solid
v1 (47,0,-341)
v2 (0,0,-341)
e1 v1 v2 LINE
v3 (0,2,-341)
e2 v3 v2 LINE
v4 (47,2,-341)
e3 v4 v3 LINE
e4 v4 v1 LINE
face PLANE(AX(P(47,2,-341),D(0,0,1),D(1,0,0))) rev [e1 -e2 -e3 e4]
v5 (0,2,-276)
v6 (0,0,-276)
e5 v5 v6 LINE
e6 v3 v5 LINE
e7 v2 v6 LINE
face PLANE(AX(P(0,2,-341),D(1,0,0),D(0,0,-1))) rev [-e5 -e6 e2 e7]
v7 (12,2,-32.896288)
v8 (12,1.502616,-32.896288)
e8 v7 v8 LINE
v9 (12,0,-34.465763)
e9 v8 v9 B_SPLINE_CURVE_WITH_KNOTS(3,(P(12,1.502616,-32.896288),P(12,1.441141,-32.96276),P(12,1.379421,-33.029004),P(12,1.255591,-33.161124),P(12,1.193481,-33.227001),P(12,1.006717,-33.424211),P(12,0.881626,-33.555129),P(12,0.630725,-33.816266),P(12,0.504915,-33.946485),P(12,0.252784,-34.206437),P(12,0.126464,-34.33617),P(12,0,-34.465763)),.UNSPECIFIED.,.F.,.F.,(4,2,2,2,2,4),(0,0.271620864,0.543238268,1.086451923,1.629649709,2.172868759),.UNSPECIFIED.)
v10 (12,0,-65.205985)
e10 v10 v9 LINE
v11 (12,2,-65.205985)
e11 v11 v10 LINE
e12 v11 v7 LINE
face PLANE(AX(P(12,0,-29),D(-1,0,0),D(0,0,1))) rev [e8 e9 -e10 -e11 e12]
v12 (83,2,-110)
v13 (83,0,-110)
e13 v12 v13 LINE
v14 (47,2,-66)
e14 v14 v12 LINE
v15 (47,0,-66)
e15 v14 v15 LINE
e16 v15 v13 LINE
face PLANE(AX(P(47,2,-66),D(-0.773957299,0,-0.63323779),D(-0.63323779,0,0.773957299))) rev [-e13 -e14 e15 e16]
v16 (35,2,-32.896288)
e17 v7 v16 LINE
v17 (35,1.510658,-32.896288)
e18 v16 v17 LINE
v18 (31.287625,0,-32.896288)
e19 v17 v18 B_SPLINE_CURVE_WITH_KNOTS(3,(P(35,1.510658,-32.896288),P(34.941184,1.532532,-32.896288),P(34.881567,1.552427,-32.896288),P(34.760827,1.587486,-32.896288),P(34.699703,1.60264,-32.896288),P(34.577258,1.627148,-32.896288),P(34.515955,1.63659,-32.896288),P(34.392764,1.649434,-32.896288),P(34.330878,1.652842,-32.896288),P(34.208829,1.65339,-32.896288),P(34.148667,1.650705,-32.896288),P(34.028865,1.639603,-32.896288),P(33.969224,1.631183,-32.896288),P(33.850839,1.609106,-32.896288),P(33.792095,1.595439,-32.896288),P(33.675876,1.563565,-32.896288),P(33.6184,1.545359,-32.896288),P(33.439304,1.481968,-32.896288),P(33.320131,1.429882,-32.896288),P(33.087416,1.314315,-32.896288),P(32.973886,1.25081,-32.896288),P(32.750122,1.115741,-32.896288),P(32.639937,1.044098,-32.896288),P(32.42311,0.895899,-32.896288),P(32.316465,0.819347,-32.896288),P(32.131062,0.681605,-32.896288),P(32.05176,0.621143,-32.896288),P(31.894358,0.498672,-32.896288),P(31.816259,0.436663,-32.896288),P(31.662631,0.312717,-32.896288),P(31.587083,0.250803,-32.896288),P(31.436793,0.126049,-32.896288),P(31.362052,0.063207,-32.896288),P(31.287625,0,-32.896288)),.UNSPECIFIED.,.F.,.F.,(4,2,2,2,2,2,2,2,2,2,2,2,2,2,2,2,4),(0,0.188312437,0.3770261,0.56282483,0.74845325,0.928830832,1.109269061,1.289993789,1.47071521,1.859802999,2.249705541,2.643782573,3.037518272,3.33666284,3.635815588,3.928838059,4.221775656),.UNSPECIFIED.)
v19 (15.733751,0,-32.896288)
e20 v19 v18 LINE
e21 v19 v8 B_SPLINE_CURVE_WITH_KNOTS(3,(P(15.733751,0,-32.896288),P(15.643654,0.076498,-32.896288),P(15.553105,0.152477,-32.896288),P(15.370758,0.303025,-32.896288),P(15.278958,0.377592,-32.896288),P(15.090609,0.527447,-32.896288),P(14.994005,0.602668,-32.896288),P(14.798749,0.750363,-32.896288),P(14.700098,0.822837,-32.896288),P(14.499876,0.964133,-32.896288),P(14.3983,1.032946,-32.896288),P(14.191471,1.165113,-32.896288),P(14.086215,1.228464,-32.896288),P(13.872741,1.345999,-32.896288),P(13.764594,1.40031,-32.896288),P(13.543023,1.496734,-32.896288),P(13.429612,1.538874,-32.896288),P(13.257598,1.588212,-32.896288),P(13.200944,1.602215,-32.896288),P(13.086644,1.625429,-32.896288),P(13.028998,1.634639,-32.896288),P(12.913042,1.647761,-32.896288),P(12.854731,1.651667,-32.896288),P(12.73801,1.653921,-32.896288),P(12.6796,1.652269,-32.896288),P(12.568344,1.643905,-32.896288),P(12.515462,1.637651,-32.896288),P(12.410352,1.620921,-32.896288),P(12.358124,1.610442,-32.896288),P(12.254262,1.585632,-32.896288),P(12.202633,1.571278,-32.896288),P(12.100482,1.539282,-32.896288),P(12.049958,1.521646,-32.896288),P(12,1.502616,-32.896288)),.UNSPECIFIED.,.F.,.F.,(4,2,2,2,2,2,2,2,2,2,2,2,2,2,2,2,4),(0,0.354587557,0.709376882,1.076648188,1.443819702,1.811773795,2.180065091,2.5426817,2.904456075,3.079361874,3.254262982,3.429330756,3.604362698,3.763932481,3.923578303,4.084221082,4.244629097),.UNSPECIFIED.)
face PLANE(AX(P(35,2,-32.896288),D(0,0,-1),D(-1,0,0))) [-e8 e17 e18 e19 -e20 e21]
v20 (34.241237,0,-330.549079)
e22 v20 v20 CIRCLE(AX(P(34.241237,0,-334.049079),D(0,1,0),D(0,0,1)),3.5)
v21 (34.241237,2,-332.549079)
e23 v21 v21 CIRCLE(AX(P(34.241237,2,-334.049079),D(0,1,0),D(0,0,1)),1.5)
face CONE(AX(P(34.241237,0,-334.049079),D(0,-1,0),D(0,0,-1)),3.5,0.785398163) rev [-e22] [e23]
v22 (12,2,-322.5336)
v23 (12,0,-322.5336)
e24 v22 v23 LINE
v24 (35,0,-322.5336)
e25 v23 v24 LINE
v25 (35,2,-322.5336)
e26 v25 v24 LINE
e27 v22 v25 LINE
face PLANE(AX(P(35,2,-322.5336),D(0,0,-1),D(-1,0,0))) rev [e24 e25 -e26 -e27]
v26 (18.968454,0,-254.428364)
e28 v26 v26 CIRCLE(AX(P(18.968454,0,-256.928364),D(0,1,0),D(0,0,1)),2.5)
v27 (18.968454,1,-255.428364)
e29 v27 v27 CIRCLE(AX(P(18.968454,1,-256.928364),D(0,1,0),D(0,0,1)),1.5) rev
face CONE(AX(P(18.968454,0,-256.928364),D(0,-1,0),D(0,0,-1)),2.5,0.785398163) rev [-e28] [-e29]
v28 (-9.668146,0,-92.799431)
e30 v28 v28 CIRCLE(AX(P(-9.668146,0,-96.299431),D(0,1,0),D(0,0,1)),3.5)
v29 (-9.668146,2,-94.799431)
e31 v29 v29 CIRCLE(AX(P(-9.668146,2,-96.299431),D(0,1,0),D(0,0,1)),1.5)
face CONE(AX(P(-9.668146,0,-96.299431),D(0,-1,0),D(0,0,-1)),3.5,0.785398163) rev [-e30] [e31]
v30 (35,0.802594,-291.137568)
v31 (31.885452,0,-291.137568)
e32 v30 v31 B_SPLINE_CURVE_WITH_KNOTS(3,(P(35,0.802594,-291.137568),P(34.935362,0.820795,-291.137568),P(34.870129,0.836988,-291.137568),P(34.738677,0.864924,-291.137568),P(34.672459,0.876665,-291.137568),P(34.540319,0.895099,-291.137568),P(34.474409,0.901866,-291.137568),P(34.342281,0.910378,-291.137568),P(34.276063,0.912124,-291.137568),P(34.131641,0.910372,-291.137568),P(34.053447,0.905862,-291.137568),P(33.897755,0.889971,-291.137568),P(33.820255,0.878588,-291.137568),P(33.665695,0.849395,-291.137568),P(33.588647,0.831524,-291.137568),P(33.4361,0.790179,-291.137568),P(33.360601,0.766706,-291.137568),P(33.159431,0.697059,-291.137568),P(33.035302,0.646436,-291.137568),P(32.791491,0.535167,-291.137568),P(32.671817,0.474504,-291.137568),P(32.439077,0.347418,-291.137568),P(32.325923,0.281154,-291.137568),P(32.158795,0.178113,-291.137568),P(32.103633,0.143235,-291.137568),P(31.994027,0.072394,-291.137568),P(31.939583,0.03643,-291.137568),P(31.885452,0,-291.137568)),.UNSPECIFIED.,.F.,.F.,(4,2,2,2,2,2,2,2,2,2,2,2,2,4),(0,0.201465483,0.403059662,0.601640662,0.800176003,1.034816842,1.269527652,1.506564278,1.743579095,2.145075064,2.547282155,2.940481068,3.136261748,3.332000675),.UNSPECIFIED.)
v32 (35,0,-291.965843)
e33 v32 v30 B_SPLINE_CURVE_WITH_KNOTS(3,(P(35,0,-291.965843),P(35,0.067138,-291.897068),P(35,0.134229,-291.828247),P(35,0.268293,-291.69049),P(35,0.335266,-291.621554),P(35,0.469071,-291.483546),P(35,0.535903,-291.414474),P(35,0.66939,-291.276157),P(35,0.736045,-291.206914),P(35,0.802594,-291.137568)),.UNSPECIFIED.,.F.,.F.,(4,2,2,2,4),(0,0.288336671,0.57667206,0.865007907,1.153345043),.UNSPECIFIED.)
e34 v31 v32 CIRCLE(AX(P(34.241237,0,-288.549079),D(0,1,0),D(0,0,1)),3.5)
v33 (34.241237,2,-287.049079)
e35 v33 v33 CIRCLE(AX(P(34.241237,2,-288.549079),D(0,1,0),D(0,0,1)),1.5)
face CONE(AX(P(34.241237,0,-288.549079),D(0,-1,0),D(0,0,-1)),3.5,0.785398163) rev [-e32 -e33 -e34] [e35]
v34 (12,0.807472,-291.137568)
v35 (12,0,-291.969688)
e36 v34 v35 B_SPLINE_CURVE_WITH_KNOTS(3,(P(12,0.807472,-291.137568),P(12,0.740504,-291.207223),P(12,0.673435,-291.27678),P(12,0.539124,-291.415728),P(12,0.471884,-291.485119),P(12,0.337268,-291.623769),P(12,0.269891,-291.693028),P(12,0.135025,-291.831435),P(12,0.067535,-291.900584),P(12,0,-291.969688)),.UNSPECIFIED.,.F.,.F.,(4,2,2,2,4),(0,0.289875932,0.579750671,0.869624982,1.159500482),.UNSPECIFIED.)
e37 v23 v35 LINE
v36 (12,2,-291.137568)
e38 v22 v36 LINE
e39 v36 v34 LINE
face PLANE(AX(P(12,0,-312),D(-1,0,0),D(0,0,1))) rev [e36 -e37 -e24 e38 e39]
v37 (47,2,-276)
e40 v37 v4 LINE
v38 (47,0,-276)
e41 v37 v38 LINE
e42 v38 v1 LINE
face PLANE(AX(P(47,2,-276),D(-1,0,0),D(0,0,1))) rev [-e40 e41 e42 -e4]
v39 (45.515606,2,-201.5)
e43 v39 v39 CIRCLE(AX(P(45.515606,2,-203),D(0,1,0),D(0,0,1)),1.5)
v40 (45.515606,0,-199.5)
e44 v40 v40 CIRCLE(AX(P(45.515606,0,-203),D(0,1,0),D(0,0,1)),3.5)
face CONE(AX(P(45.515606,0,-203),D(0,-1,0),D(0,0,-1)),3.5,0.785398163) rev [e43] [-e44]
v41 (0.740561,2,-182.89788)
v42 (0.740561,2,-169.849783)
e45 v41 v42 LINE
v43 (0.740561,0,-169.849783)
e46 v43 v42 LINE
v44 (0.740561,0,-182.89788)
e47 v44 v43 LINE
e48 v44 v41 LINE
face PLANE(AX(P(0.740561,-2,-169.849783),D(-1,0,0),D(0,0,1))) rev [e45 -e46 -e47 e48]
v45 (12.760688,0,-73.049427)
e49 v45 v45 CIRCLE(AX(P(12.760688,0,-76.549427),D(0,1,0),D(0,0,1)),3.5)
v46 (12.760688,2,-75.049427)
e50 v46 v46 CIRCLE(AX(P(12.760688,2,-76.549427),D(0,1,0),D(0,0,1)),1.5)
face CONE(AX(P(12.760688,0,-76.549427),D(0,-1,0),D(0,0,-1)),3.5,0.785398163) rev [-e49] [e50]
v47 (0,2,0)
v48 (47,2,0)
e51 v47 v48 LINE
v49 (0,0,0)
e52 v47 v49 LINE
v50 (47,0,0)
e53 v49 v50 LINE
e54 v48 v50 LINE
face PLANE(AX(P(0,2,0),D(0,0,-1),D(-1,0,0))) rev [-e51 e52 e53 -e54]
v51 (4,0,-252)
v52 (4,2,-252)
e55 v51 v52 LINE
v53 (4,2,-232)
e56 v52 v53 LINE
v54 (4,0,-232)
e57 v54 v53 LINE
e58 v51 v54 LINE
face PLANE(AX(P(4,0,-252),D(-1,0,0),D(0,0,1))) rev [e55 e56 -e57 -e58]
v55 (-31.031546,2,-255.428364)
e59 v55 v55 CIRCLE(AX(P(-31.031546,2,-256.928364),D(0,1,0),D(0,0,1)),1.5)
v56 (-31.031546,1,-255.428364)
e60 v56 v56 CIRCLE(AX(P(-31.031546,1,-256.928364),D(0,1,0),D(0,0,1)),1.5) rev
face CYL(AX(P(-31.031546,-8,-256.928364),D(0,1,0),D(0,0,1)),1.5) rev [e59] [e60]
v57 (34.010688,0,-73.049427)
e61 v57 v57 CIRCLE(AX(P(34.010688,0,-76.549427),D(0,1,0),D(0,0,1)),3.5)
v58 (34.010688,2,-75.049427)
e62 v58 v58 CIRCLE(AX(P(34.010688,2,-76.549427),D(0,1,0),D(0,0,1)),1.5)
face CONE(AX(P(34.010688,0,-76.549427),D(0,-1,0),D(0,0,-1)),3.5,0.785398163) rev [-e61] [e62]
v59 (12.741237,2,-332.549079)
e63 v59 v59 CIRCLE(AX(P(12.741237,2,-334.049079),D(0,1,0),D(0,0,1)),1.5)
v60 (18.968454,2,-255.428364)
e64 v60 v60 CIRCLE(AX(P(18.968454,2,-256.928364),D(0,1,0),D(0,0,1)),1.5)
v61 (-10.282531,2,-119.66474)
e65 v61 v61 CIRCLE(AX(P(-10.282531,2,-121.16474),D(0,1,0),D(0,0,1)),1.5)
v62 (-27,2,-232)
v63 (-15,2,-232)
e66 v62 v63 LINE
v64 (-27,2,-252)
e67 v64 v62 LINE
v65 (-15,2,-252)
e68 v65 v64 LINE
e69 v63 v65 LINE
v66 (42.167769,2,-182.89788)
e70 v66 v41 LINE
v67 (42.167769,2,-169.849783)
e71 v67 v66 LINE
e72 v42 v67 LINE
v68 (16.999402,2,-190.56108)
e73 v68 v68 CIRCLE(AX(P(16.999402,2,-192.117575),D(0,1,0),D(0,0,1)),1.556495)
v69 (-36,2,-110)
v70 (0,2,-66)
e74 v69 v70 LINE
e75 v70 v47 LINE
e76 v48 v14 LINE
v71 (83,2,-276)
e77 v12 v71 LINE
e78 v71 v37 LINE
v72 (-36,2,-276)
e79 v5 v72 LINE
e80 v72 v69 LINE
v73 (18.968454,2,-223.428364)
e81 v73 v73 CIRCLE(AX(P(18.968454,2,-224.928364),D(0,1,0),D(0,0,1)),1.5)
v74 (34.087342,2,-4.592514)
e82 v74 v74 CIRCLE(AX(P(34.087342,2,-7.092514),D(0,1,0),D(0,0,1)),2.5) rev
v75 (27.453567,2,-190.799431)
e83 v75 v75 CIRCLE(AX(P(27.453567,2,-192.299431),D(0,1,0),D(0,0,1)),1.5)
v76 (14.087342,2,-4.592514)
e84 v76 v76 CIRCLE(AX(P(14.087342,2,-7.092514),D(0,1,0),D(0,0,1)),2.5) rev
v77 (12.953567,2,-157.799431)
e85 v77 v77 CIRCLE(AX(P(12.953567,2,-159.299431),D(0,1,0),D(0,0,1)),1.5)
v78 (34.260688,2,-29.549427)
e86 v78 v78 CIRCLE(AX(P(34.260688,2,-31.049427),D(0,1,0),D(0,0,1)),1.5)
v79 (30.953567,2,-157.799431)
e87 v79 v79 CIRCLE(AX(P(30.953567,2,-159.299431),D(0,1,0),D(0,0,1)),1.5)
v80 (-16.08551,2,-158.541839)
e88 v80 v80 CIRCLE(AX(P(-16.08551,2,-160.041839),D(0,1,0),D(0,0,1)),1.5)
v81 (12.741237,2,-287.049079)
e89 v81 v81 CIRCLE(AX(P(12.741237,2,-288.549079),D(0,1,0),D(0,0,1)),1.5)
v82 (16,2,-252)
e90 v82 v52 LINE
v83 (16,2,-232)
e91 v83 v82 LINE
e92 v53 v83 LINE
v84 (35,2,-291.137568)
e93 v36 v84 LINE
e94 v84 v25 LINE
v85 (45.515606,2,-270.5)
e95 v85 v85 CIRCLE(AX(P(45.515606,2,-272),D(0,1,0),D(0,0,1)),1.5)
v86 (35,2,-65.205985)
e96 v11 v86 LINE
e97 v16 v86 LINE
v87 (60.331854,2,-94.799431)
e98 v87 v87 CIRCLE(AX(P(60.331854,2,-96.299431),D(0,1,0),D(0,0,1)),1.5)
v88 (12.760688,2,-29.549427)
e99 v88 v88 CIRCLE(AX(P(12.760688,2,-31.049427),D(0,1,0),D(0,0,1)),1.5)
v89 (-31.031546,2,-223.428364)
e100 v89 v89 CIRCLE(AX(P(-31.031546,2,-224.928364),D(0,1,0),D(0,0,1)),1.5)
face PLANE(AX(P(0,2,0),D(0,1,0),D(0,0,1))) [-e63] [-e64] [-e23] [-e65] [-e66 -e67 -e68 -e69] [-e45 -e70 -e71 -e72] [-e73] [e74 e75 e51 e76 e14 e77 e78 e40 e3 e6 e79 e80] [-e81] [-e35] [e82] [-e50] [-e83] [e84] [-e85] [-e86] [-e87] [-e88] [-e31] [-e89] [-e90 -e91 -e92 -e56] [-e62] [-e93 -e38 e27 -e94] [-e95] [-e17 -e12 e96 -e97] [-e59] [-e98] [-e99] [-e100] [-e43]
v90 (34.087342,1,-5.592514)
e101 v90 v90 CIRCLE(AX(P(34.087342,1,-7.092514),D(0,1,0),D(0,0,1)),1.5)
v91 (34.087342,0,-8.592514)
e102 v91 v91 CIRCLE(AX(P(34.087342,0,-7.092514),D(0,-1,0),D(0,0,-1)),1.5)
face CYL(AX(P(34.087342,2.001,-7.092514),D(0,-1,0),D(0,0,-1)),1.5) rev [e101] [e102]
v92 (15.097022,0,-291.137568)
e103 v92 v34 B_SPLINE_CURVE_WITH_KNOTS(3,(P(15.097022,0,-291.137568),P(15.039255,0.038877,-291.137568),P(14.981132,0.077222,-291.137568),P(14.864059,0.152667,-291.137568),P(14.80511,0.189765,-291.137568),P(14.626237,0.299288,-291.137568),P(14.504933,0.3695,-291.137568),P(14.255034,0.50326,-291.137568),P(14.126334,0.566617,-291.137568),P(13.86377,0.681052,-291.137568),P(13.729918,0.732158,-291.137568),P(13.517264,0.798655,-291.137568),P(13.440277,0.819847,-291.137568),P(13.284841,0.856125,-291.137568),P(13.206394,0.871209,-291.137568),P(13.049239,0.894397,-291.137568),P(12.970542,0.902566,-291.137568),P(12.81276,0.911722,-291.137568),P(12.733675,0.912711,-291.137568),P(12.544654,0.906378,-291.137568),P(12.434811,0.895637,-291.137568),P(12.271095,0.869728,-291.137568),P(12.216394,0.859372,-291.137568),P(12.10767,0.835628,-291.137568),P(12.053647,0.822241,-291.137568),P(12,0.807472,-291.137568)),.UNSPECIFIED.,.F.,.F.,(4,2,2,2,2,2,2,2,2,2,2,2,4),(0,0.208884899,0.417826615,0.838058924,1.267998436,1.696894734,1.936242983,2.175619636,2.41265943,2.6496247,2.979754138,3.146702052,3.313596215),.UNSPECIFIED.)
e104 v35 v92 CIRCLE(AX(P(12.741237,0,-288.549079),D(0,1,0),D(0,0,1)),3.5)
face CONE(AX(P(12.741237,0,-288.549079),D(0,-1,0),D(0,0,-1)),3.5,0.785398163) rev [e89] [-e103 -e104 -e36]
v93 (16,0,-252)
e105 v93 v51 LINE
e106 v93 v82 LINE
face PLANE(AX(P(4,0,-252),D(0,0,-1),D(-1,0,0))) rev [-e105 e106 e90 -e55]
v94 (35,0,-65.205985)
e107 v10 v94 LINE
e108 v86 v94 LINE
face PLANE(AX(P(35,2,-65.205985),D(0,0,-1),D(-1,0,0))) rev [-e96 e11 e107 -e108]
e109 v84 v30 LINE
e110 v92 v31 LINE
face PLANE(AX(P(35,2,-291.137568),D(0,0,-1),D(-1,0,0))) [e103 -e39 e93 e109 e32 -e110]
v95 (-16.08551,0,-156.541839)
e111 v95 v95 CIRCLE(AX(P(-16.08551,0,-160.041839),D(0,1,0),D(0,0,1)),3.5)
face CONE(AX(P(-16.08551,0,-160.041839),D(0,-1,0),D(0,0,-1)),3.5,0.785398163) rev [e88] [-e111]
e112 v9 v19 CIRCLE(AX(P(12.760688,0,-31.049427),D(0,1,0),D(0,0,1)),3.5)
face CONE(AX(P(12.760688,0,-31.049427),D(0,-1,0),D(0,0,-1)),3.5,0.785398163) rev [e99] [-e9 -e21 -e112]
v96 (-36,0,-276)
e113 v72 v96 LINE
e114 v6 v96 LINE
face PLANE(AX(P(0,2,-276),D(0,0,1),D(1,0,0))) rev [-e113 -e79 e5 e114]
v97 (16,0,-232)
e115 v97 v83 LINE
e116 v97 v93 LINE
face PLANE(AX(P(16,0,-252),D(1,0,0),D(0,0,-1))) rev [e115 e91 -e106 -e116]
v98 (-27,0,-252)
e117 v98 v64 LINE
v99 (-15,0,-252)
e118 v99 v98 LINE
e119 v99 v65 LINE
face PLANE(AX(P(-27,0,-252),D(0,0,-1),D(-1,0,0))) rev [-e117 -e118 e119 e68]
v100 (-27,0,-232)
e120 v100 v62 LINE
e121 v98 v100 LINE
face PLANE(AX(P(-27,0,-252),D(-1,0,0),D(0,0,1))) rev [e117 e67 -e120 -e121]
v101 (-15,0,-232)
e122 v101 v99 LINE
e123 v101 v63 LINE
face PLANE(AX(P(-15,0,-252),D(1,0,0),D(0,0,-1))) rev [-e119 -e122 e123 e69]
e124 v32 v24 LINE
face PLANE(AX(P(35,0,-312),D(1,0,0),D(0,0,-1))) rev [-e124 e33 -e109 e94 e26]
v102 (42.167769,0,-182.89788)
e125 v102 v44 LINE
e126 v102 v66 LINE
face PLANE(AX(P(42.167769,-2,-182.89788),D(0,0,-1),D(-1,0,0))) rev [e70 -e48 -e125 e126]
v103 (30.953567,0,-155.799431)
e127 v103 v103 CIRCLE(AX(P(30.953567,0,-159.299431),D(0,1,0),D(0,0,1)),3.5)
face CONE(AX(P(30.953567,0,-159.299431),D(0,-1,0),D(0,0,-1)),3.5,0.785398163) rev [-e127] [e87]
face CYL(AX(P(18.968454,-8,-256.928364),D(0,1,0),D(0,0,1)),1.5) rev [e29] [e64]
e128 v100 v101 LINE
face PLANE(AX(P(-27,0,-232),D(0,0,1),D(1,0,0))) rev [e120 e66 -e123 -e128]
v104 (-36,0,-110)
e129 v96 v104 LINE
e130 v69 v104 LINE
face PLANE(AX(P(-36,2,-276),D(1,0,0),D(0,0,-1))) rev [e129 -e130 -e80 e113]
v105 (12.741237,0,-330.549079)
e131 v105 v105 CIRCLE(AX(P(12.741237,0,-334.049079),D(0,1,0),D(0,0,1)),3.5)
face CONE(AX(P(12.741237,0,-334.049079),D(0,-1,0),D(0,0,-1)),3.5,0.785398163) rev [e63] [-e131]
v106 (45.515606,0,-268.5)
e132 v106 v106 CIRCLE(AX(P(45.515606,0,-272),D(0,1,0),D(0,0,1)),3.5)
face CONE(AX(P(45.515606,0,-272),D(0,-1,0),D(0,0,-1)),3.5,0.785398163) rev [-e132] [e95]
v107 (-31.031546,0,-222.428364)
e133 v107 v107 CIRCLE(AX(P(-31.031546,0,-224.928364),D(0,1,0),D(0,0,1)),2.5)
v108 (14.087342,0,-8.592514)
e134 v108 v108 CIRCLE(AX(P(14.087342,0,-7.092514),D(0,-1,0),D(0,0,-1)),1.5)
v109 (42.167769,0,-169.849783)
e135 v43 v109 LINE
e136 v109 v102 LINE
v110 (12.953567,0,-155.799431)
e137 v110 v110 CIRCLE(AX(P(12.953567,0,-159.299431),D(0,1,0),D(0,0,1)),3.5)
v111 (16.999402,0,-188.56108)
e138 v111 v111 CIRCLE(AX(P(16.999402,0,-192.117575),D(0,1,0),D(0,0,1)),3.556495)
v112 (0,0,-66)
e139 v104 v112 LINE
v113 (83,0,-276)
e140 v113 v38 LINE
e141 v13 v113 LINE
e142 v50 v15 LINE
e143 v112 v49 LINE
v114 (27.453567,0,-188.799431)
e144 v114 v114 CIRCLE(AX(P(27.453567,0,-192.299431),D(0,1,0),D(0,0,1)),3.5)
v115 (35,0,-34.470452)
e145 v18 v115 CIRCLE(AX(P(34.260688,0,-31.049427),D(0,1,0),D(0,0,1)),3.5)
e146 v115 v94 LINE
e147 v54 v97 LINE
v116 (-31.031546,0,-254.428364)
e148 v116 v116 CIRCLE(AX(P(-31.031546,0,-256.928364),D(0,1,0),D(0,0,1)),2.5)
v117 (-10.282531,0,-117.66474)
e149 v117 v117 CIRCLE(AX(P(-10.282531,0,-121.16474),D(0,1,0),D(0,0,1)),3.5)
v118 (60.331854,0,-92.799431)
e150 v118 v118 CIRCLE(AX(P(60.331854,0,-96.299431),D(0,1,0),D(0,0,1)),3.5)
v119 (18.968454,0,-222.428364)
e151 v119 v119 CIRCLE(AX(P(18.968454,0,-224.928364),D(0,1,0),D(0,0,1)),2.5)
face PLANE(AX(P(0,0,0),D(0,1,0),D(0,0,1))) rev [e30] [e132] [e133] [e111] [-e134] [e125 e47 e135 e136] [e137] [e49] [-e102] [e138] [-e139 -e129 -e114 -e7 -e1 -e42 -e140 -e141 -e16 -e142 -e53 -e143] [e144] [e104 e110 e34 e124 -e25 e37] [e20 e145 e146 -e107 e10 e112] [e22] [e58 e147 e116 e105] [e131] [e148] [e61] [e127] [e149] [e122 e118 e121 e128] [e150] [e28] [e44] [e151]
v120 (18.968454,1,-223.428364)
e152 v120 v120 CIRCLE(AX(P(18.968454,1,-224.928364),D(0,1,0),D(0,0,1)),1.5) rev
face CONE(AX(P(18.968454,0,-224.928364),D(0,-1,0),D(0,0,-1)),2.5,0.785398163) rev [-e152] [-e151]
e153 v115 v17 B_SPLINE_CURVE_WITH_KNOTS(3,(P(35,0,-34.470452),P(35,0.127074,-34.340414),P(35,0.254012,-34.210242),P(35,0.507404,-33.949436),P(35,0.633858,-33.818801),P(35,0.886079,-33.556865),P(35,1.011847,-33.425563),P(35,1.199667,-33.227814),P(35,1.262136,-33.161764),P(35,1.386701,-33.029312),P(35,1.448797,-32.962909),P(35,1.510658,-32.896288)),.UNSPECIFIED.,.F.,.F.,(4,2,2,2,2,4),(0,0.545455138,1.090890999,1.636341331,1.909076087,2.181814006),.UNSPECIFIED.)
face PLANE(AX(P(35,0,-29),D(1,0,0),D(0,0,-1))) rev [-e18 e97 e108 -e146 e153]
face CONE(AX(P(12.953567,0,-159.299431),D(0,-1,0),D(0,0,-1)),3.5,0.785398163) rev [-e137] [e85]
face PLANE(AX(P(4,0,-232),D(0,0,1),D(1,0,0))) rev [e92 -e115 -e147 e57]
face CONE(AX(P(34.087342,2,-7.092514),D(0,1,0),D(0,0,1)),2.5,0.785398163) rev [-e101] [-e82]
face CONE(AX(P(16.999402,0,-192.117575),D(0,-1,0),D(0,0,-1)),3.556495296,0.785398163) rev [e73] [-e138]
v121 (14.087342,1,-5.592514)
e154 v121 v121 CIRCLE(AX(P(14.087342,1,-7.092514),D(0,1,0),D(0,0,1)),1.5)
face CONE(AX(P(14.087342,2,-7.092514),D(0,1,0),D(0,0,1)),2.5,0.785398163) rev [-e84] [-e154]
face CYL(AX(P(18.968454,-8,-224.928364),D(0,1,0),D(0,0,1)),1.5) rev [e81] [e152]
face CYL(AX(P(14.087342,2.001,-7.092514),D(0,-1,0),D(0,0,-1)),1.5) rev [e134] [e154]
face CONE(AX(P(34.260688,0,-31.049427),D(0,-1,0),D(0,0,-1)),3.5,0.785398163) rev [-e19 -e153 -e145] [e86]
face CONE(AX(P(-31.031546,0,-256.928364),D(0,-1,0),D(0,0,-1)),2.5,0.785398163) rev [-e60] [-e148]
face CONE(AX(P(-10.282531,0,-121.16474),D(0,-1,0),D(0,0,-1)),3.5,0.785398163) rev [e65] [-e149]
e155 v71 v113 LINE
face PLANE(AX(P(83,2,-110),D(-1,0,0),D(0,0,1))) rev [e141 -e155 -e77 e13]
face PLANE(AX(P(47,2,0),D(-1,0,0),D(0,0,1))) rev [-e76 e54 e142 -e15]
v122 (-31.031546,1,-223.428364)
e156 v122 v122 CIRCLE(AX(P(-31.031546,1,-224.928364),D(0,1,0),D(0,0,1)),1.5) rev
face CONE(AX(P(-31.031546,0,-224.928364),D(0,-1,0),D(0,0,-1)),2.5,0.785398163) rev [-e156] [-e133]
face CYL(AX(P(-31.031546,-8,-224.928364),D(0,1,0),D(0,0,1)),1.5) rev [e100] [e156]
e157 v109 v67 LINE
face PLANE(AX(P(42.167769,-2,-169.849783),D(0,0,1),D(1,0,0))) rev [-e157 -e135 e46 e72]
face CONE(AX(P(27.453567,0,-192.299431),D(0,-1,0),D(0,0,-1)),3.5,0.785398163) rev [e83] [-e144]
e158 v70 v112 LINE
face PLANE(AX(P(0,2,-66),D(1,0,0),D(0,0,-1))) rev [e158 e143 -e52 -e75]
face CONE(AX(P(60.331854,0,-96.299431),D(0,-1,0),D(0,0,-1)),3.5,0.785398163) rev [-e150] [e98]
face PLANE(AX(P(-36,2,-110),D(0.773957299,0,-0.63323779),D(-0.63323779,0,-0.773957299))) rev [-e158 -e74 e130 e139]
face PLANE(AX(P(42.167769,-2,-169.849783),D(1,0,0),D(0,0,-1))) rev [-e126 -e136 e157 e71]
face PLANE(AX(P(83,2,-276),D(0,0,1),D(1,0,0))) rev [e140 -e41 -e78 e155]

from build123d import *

# Parameters (mm, degrees)
BOSS_EXTRUDE2_DEPTH = 2
SKETCH5_W           = 23
SKETCH5_H           = 26
CUT_EXTRUDE1_DEPTH  = 2
SKETCH6_W           = 23
SKETCH6_H           = 26
CUT_EXTRUDE2_DEPTH  = 2
SKETCH7_W           = 12
SKETCH7_H           = 20
CUT_EXTRUDE3_DEPTH  = 2
SKETCH8_W           = 12
SKETCH8_H           = 20
CUT_EXTRUDE4_DEPTH  = 2
SKETCH9_R           = 1.5
CUT_EXTRUDE5_DEPTH  = 4
SKETCH10_R          = 1.5
CUT_EXTRUDE6_DEPTH  = 4
SKETCH11_R          = 1.5
SKETCH11_R_2        = 1.556495296
CUT_EXTRUDE7_DEPTH  = 4
CHAMFER1_SIZE       = 2
SKETCH12_W          = 41.427208619
SKETCH12_H          = 13.04809718
CUT_EXTRUDE8_DEPTH  = 4
SKETCH13_R          = 1.5
CUT_EXTRUDE9_DEPTH  = 10
CHAMFER2_SIZE       = 2
SKETCH14_W          = 23
SKETCH14_H          = 3.896287967
BOSS_EXTRUDE3_DEPTH = 2
SKETCH15_W          = 23
SKETCH15_H          = 6.016100964
CUT_EXTRUDE10_DEPTH = 2
SKETCH16_W          = 23
SKETCH16_H          = 4.189884345
CUT_EXTRUDE11_DEPTH = 2
SKETCH17_R          = 1.5
CUT_EXTRUDE12_DEPTH = 2
CHAMFER4_SIZE       = 2
SKETCH19_W          = 23
SKETCH19_H          = 7.922215634
CUT_EXTRUDE13_DEPTH = 2
SKETCH20_W          = 23
SKETCH20_H          = 2.611384529
CUT_EXTRUDE14_DEPTH = 2
SKETCH22_W          = 23
SKETCH22_H          = 5.13756828
BOSS_EXTRUDE5_DEPTH = 2
SKETCH23_R          = 1.5
CUT_EXTRUDE16_DEPTH = 2
CHAMFER6_SIZE       = 2
SKETCH24_R          = 1.5
CUT_EXTRUDE17_DEPTH = 10
CHAMFER7_SIZE       = 1
CUT_EXTRUDE18_REACH = 352.962
SKETCH25_R          = 1.5
CHAMFER8_SIZE       = 1


# Some blends are built 0.0001 mm under size
with BuildPart() as part:
    # Sketch4 → Boss-Extrude2 (new body)
    with BuildSketch(Plane(origin=(0, 0, 0), x_dir=(1, 0, 0), z_dir=(0, 1, 0))):
        Polygon((0, 341), (0, 276), (-36, 276), (-36, 110), (0, 66), (0, 0), (47, 0), (47, 66), (83, 110), (83, 276), (47, 276), (47, 341), align=None)
    extrude(amount=BOSS_EXTRUDE2_DEPTH)

    # Sketch5 → Cut-Extrude1 (cut)
    with BuildSketch(Plane(origin=(0, 2, 0), x_dir=(1, 0, 0), z_dir=(0, 1, 0))):
        with Locations((23.5, 42)):
            Rectangle(SKETCH5_W, SKETCH5_H)
    extrude(amount=-CUT_EXTRUDE1_DEPTH, mode=Mode.SUBTRACT)

    # Sketch6 → Cut-Extrude2 (cut)
    with BuildSketch(Plane(origin=(0, 2, 0), x_dir=(1, 0, 0), z_dir=(0, 1, 0))):
        with Locations((23.5, 299)):
            Rectangle(SKETCH6_W, SKETCH6_H)
    extrude(amount=-CUT_EXTRUDE2_DEPTH, mode=Mode.SUBTRACT)

    # Sketch7 → Cut-Extrude3 (cut)
    with BuildSketch(Plane(origin=(0, 2, 0), x_dir=(1, 0, 0), z_dir=(0, 1, 0))):
        with Locations((-21, 242)):
            Rectangle(SKETCH7_W, SKETCH7_H)
    extrude(amount=-CUT_EXTRUDE3_DEPTH, mode=Mode.SUBTRACT)

    # Sketch8 → Cut-Extrude4 (cut)
    with BuildSketch(Plane(origin=(0, 2, 0), x_dir=(1, 0, 0), z_dir=(0, 1, 0))):
        with Locations((10, 242)):
            Rectangle(SKETCH8_W, SKETCH8_H)
    extrude(amount=-CUT_EXTRUDE4_DEPTH, mode=Mode.SUBTRACT)

    # Sketch9 → Cut-Extrude5 (cut)
    with BuildSketch(Plane(origin=(0, 2, 0), x_dir=(1, 0, 0), z_dir=(0, 1, 0))):
        with Locations(Location((-9.668146344, 96.299430829, 0), (0, 0, 270))):
            Circle(SKETCH9_R)
        with Locations(Location((60.331853656, 96.299430845, 0), (0, 0, 270))):
            Circle(SKETCH9_R)
    extrude(amount=-CUT_EXTRUDE5_DEPTH, mode=Mode.SUBTRACT)

    # Sketch10 → Cut-Extrude6 (cut)
    with BuildSketch(Plane(origin=(0, 2, 0), x_dir=(1, 0, 0), z_dir=(0, 1, 0))):
        with Locations(Location((45.515605611, 272, 0), (0, 0, 270))):
            Circle(SKETCH10_R)
        with Locations(Location((45.515605611, 203, 0), (0, 0, 270))):
            Circle(SKETCH10_R)
    extrude(amount=-CUT_EXTRUDE6_DEPTH, mode=Mode.SUBTRACT)

    # Sketch11 → Cut-Extrude7 (cut)
    with BuildSketch(Plane(origin=(0, 2, 0), x_dir=(1, 0, 0), z_dir=(0, 1, 0))):
        with Locations(Location((27.453567096, 192.29943079, 0), (0, 0, 270))):
            Circle(SKETCH11_R)
        with Locations(Location((16.999402189, 192.117575161, 0), (0, 0, 270))):
            Circle(SKETCH11_R_2)
        with Locations(Location((12.953567087, 159.299430834, 0), (0, 0, 270))):
            Circle(SKETCH11_R)
        with Locations(Location((30.953567087, 159.299430838, 0), (0, 0, 270))):
            Circle(SKETCH11_R)
    extrude(amount=-CUT_EXTRUDE7_DEPTH, mode=Mode.SUBTRACT)

    # Chamfer1
    chamfer1_edges = [part.edges().sort_by_distance(p)[0] for p in [
        (-9.668146344, 0, -97.799430829),
        (60.331853656, 0, -97.799430845),
        (45.515605611, 0, -273.5),
        (45.515605611, 0, -204.5),
        (30.953567087, 0, -160.799430838),
        (12.953567087, 0, -160.799430834),
        (16.999402189, 0, -193.674070457),
        (27.453567096, 0, -193.79943079),
    ]]
    chamfer(chamfer1_edges, length=CHAMFER1_SIZE - 0.0001)  # a hair under: the kernel refuses the full size

    # Sketch12 → Cut-Extrude8 (cut)
    with BuildSketch(Plane(origin=(0, 2, 0), x_dir=(1, 0, 0), z_dir=(0, 1, 0))):
        with Locations((21.45416489, 176.373831134)):
            Rectangle(SKETCH12_W, SKETCH12_H)
    extrude(amount=-CUT_EXTRUDE8_DEPTH, mode=Mode.SUBTRACT)

    # Sketch13 → Cut-Extrude9 (cut)
    with BuildSketch(Plane(origin=(0, 2, 0), x_dir=(1, 0, 0), z_dir=(0, 1, 0))):
        with Locations(Location((-16.085510492, 160.04183924, 0), (0, 0, 270))):
            Circle(SKETCH13_R)
        with Locations(Location((-10.282531236, 121.164739857, 0), (0, 0, 270))):
            Circle(SKETCH13_R)
    extrude(amount=-CUT_EXTRUDE9_DEPTH, mode=Mode.SUBTRACT)

    # Chamfer2
    chamfer2_edges = [part.edges().sort_by_distance(p)[0] for p in [
        (-16.085510492, 0, -161.54183924),
        (-10.282531236, 0, -122.664739857),
    ]]
    chamfer(chamfer2_edges, length=CHAMFER2_SIZE - 0.0001)  # a hair under: the kernel refuses the full size

    # Sketch14 → Boss-Extrude3 (add)
    with BuildSketch(Plane(origin=(0, 0, 0), x_dir=(-1, 0, 0), z_dir=(0, -1, 0))):
        with Locations((-23.5, 30.948143984)):
            Rectangle(SKETCH14_W, SKETCH14_H)
    extrude(amount=-BOSS_EXTRUDE3_DEPTH)

    # Sketch15 → Cut-Extrude10 (cut)
    with BuildSketch(Plane.XZ):
        with Locations((23.5, -58.008050482)):
            Rectangle(SKETCH15_W, SKETCH15_H)
    extrude(amount=-CUT_EXTRUDE10_DEPTH, mode=Mode.SUBTRACT)

    # Sketch16 → Cut-Extrude11 (cut)
    with BuildSketch(Plane.XZ):
        with Locations((23.5, -63.111043137)):
            Rectangle(SKETCH16_W, SKETCH16_H)
    extrude(amount=-CUT_EXTRUDE11_DEPTH, mode=Mode.SUBTRACT)

    # Sketch17 → Cut-Extrude12 (cut)
    with BuildSketch(Plane(origin=(0, 2, 0), x_dir=(1, 0, 0), z_dir=(0, 1, 0))):
        with Locations(Location((34.01068775, 76.54942652, 0), (0, 0, 270))):
            Circle(SKETCH17_R)
        with Locations(Location((12.76068775, 76.549426515, 0), (0, 0, 270))):
            Circle(SKETCH17_R)
        with Locations(Location((12.760687761, 31.049426515, 0), (0, 0, 270))):
            Circle(SKETCH17_R)
        with Locations(Location((34.260687761, 31.04942652, 0), (0, 0, 270))):
            Circle(SKETCH17_R)
    extrude(amount=-CUT_EXTRUDE12_DEPTH, mode=Mode.SUBTRACT)

    # Chamfer4
    # the kernel refuses this chamfer: 2 mm, written as the material it takes off along each edge
    with BuildSketch(Plane(origin=(34.260687761, 0, -31.04942652), x_dir=(0, 0, 1), z_dir=(-1, 0, 0))) as chamfer4_piece_1:
        Polygon((1.5 + CHAMFER4_SIZE, 0), (1.5, CHAMFER4_SIZE), (1.5, 0), align=None)
    revolve(axis=Axis((34.260687761, 0, -31.04942652), (0, 1, 0)), mode=Mode.SUBTRACT)
    with BuildSketch(Plane(origin=(12.760687761, 0, -31.049426515), x_dir=(0, 0, 1), z_dir=(-1, 0, 0))) as chamfer4_piece_2:
        Polygon((1.5 + CHAMFER4_SIZE, 0), (1.5, CHAMFER4_SIZE), (1.5, 0), align=None)
    revolve(axis=Axis((12.760687761, 0, -31.049426515), (0, 1, 0)), mode=Mode.SUBTRACT)
    with BuildSketch(Plane(origin=(12.76068775, 0, -76.549426515), x_dir=(0, 0, 1), z_dir=(-1, 0, 0))) as chamfer4_piece_3:
        Polygon((1.5 + CHAMFER4_SIZE, 0), (1.5, CHAMFER4_SIZE), (1.5, 0), align=None)
    revolve(axis=Axis((12.76068775, 0, -76.549426515), (0, 1, 0)), mode=Mode.SUBTRACT)
    with BuildSketch(Plane(origin=(34.01068775, 0, -76.54942652), x_dir=(0, 0, 1), z_dir=(-1, 0, 0))) as chamfer4_piece_4:
        Polygon((1.5 + CHAMFER4_SIZE, 0), (1.5, CHAMFER4_SIZE), (1.5, 0), align=None)
    revolve(axis=Axis((34.01068775, 0, -76.54942652), (0, 1, 0)), mode=Mode.SUBTRACT)

    # Sketch19 → Cut-Extrude13 (cut)
    with BuildSketch(Plane.XZ):
        with Locations((23.5, -315.961107817)):
            Rectangle(SKETCH19_W, SKETCH19_H)
    extrude(amount=-CUT_EXTRUDE13_DEPTH, mode=Mode.SUBTRACT)

    # Sketch20 → Cut-Extrude14 (cut)
    with BuildSketch(Plane.XZ):
        with Locations((23.5, -321.227907899)):
            Rectangle(SKETCH20_W, SKETCH20_H)
    extrude(amount=-CUT_EXTRUDE14_DEPTH, mode=Mode.SUBTRACT)

    # Sketch22 → Boss-Extrude5 (add)
    with BuildSketch(Plane(origin=(0, 0, 0), x_dir=(-1, 0, 0), z_dir=(0, -1, 0))):
        with Locations((-23.5, 288.56878414)):
            Rectangle(SKETCH22_W, SKETCH22_H)
    extrude(amount=-BOSS_EXTRUDE5_DEPTH)

    # Sketch23 → Cut-Extrude16 (cut)
    with BuildSketch(Plane(origin=(0, 2, 0), x_dir=(1, 0, 0), z_dir=(0, 1, 0))):
        with Locations(Location((12.74123696, 334.049079093, 0), (0, 0, 270))):
            Circle(SKETCH23_R)
        with Locations(Location((34.24123696, 334.049079093, 0), (0, 0, 270))):
            Circle(SKETCH23_R)
        with Locations(Location((34.24123696, 288.549079093, 0), (0, 0, 270))):
            Circle(SKETCH23_R)
        with Locations(Location((12.74123696, 288.549079093, 0), (0, 0, 270))):
            Circle(SKETCH23_R)
    extrude(amount=-CUT_EXTRUDE16_DEPTH, mode=Mode.SUBTRACT)

    # Chamfer6
    # the kernel refuses this chamfer: 2 mm, written as the material it takes off along each edge
    with BuildSketch(Plane(origin=(12.74123696, 0, -288.549079093), x_dir=(0, 0, 1), z_dir=(-1, 0, 0))) as chamfer6_piece_1:
        Polygon((1.5 + CHAMFER6_SIZE, 0), (1.5, CHAMFER6_SIZE), (1.5, 0), align=None)
    revolve(axis=Axis((12.74123696, 0, -288.549079093), (0, 1, 0)), mode=Mode.SUBTRACT)
    with BuildSketch(Plane(origin=(34.24123696, 0, -288.549079093), x_dir=(0, 0, 1), z_dir=(-1, 0, 0))) as chamfer6_piece_2:
        Polygon((1.5 + CHAMFER6_SIZE, 0), (1.5, CHAMFER6_SIZE), (1.5, 0), align=None)
    revolve(axis=Axis((34.24123696, 0, -288.549079093), (0, 1, 0)), mode=Mode.SUBTRACT)
    with BuildSketch(Plane(origin=(34.24123696, 0, -334.049079093), x_dir=(0, 0, 1), z_dir=(-1, 0, 0))) as chamfer6_piece_3:
        Polygon((1.5 + CHAMFER6_SIZE, 0), (1.5, CHAMFER6_SIZE), (1.5, 0), align=None)
    revolve(axis=Axis((34.24123696, 0, -334.049079093), (0, 1, 0)), mode=Mode.SUBTRACT)
    with BuildSketch(Plane(origin=(12.74123696, 0, -334.049079093), x_dir=(0, 0, 1), z_dir=(-1, 0, 0))) as chamfer6_piece_4:
        Polygon((1.5 + CHAMFER6_SIZE, 0), (1.5, CHAMFER6_SIZE), (1.5, 0), align=None)
    revolve(axis=Axis((12.74123696, 0, -334.049079093), (0, 1, 0)), mode=Mode.SUBTRACT)

    # Sketch24 → Cut-Extrude17 (cut)
    with BuildSketch(Plane(origin=(0, 2, 0), x_dir=(1, 0, 0), z_dir=(0, 1, 0))):
        with Locations(Location((-31.031546179, 256.928363681, 0), (0, 0, 270))):
            Circle(SKETCH24_R)
        with Locations(Location((-31.031546172, 224.928363681, 0), (0, 0, 270))):
            Circle(SKETCH24_R)
        with Locations(Location((18.968453821, 256.928363693, 0), (0, 0, 270))):
            Circle(SKETCH24_R)
        with Locations(Location((18.968453828, 224.928363693, 0), (0, 0, 270))):
            Circle(SKETCH24_R)
    extrude(amount=-CUT_EXTRUDE17_DEPTH, mode=Mode.SUBTRACT)

    # Chamfer7
    chamfer7_edges = [part.edges().sort_by_distance(p)[0] for p in [
        (-31.031546172, 0, -226.428363681),
        (18.968453821, 0, -258.428363693),
        (18.968453828, 0, -226.428363693),
        (-31.031546179, 0, -258.428363681),
    ]]
    chamfer(chamfer7_edges, length=CHAMFER7_SIZE)

    # Sketch25 → Cut-Extrude18 (cut, up to next)
    with BuildSketch(Plane.XZ, mode=Mode.PRIVATE) as cut_extrude18_sk1:
        with Locations(Location((14.087342161, -7.092513938, 0), (0, 0, 270))):
            Circle(SKETCH25_R)
    cut_extrude18_tool1 = extrude(cut_extrude18_sk1.sketch, amount=-CUT_EXTRUDE18_REACH, mode=Mode.PRIVATE) & part.part
    # Sketch25 → Cut-Extrude18 (cut, up to next)
    with BuildSketch(Plane.XZ, mode=Mode.PRIVATE) as cut_extrude18_sk2:
        with Locations(Location((34.087342161, -7.092513938, 0), (0, 0, 270))):
            Circle(SKETCH25_R)
    cut_extrude18_tool2 = extrude(cut_extrude18_sk2.sketch, amount=-CUT_EXTRUDE18_REACH, mode=Mode.PRIVATE) & part.part
    add(cut_extrude18_tool1.solids().sort_by_distance((14.087342, 0, -7.092514))[0], mode=Mode.SUBTRACT)
    add(cut_extrude18_tool2.solids().sort_by_distance((34.087342, 0, -7.092514))[0], mode=Mode.SUBTRACT)

    # Chamfer8
    chamfer8_edges = [part.edges().sort_by_distance(p)[0] for p in [
        (14.087342161, 2, -5.592513938),
        (34.087342161, 2, -5.592513938),
    ]]
    chamfer(chamfer8_edges, length=CHAMFER8_SIZE)


solid = part.part
